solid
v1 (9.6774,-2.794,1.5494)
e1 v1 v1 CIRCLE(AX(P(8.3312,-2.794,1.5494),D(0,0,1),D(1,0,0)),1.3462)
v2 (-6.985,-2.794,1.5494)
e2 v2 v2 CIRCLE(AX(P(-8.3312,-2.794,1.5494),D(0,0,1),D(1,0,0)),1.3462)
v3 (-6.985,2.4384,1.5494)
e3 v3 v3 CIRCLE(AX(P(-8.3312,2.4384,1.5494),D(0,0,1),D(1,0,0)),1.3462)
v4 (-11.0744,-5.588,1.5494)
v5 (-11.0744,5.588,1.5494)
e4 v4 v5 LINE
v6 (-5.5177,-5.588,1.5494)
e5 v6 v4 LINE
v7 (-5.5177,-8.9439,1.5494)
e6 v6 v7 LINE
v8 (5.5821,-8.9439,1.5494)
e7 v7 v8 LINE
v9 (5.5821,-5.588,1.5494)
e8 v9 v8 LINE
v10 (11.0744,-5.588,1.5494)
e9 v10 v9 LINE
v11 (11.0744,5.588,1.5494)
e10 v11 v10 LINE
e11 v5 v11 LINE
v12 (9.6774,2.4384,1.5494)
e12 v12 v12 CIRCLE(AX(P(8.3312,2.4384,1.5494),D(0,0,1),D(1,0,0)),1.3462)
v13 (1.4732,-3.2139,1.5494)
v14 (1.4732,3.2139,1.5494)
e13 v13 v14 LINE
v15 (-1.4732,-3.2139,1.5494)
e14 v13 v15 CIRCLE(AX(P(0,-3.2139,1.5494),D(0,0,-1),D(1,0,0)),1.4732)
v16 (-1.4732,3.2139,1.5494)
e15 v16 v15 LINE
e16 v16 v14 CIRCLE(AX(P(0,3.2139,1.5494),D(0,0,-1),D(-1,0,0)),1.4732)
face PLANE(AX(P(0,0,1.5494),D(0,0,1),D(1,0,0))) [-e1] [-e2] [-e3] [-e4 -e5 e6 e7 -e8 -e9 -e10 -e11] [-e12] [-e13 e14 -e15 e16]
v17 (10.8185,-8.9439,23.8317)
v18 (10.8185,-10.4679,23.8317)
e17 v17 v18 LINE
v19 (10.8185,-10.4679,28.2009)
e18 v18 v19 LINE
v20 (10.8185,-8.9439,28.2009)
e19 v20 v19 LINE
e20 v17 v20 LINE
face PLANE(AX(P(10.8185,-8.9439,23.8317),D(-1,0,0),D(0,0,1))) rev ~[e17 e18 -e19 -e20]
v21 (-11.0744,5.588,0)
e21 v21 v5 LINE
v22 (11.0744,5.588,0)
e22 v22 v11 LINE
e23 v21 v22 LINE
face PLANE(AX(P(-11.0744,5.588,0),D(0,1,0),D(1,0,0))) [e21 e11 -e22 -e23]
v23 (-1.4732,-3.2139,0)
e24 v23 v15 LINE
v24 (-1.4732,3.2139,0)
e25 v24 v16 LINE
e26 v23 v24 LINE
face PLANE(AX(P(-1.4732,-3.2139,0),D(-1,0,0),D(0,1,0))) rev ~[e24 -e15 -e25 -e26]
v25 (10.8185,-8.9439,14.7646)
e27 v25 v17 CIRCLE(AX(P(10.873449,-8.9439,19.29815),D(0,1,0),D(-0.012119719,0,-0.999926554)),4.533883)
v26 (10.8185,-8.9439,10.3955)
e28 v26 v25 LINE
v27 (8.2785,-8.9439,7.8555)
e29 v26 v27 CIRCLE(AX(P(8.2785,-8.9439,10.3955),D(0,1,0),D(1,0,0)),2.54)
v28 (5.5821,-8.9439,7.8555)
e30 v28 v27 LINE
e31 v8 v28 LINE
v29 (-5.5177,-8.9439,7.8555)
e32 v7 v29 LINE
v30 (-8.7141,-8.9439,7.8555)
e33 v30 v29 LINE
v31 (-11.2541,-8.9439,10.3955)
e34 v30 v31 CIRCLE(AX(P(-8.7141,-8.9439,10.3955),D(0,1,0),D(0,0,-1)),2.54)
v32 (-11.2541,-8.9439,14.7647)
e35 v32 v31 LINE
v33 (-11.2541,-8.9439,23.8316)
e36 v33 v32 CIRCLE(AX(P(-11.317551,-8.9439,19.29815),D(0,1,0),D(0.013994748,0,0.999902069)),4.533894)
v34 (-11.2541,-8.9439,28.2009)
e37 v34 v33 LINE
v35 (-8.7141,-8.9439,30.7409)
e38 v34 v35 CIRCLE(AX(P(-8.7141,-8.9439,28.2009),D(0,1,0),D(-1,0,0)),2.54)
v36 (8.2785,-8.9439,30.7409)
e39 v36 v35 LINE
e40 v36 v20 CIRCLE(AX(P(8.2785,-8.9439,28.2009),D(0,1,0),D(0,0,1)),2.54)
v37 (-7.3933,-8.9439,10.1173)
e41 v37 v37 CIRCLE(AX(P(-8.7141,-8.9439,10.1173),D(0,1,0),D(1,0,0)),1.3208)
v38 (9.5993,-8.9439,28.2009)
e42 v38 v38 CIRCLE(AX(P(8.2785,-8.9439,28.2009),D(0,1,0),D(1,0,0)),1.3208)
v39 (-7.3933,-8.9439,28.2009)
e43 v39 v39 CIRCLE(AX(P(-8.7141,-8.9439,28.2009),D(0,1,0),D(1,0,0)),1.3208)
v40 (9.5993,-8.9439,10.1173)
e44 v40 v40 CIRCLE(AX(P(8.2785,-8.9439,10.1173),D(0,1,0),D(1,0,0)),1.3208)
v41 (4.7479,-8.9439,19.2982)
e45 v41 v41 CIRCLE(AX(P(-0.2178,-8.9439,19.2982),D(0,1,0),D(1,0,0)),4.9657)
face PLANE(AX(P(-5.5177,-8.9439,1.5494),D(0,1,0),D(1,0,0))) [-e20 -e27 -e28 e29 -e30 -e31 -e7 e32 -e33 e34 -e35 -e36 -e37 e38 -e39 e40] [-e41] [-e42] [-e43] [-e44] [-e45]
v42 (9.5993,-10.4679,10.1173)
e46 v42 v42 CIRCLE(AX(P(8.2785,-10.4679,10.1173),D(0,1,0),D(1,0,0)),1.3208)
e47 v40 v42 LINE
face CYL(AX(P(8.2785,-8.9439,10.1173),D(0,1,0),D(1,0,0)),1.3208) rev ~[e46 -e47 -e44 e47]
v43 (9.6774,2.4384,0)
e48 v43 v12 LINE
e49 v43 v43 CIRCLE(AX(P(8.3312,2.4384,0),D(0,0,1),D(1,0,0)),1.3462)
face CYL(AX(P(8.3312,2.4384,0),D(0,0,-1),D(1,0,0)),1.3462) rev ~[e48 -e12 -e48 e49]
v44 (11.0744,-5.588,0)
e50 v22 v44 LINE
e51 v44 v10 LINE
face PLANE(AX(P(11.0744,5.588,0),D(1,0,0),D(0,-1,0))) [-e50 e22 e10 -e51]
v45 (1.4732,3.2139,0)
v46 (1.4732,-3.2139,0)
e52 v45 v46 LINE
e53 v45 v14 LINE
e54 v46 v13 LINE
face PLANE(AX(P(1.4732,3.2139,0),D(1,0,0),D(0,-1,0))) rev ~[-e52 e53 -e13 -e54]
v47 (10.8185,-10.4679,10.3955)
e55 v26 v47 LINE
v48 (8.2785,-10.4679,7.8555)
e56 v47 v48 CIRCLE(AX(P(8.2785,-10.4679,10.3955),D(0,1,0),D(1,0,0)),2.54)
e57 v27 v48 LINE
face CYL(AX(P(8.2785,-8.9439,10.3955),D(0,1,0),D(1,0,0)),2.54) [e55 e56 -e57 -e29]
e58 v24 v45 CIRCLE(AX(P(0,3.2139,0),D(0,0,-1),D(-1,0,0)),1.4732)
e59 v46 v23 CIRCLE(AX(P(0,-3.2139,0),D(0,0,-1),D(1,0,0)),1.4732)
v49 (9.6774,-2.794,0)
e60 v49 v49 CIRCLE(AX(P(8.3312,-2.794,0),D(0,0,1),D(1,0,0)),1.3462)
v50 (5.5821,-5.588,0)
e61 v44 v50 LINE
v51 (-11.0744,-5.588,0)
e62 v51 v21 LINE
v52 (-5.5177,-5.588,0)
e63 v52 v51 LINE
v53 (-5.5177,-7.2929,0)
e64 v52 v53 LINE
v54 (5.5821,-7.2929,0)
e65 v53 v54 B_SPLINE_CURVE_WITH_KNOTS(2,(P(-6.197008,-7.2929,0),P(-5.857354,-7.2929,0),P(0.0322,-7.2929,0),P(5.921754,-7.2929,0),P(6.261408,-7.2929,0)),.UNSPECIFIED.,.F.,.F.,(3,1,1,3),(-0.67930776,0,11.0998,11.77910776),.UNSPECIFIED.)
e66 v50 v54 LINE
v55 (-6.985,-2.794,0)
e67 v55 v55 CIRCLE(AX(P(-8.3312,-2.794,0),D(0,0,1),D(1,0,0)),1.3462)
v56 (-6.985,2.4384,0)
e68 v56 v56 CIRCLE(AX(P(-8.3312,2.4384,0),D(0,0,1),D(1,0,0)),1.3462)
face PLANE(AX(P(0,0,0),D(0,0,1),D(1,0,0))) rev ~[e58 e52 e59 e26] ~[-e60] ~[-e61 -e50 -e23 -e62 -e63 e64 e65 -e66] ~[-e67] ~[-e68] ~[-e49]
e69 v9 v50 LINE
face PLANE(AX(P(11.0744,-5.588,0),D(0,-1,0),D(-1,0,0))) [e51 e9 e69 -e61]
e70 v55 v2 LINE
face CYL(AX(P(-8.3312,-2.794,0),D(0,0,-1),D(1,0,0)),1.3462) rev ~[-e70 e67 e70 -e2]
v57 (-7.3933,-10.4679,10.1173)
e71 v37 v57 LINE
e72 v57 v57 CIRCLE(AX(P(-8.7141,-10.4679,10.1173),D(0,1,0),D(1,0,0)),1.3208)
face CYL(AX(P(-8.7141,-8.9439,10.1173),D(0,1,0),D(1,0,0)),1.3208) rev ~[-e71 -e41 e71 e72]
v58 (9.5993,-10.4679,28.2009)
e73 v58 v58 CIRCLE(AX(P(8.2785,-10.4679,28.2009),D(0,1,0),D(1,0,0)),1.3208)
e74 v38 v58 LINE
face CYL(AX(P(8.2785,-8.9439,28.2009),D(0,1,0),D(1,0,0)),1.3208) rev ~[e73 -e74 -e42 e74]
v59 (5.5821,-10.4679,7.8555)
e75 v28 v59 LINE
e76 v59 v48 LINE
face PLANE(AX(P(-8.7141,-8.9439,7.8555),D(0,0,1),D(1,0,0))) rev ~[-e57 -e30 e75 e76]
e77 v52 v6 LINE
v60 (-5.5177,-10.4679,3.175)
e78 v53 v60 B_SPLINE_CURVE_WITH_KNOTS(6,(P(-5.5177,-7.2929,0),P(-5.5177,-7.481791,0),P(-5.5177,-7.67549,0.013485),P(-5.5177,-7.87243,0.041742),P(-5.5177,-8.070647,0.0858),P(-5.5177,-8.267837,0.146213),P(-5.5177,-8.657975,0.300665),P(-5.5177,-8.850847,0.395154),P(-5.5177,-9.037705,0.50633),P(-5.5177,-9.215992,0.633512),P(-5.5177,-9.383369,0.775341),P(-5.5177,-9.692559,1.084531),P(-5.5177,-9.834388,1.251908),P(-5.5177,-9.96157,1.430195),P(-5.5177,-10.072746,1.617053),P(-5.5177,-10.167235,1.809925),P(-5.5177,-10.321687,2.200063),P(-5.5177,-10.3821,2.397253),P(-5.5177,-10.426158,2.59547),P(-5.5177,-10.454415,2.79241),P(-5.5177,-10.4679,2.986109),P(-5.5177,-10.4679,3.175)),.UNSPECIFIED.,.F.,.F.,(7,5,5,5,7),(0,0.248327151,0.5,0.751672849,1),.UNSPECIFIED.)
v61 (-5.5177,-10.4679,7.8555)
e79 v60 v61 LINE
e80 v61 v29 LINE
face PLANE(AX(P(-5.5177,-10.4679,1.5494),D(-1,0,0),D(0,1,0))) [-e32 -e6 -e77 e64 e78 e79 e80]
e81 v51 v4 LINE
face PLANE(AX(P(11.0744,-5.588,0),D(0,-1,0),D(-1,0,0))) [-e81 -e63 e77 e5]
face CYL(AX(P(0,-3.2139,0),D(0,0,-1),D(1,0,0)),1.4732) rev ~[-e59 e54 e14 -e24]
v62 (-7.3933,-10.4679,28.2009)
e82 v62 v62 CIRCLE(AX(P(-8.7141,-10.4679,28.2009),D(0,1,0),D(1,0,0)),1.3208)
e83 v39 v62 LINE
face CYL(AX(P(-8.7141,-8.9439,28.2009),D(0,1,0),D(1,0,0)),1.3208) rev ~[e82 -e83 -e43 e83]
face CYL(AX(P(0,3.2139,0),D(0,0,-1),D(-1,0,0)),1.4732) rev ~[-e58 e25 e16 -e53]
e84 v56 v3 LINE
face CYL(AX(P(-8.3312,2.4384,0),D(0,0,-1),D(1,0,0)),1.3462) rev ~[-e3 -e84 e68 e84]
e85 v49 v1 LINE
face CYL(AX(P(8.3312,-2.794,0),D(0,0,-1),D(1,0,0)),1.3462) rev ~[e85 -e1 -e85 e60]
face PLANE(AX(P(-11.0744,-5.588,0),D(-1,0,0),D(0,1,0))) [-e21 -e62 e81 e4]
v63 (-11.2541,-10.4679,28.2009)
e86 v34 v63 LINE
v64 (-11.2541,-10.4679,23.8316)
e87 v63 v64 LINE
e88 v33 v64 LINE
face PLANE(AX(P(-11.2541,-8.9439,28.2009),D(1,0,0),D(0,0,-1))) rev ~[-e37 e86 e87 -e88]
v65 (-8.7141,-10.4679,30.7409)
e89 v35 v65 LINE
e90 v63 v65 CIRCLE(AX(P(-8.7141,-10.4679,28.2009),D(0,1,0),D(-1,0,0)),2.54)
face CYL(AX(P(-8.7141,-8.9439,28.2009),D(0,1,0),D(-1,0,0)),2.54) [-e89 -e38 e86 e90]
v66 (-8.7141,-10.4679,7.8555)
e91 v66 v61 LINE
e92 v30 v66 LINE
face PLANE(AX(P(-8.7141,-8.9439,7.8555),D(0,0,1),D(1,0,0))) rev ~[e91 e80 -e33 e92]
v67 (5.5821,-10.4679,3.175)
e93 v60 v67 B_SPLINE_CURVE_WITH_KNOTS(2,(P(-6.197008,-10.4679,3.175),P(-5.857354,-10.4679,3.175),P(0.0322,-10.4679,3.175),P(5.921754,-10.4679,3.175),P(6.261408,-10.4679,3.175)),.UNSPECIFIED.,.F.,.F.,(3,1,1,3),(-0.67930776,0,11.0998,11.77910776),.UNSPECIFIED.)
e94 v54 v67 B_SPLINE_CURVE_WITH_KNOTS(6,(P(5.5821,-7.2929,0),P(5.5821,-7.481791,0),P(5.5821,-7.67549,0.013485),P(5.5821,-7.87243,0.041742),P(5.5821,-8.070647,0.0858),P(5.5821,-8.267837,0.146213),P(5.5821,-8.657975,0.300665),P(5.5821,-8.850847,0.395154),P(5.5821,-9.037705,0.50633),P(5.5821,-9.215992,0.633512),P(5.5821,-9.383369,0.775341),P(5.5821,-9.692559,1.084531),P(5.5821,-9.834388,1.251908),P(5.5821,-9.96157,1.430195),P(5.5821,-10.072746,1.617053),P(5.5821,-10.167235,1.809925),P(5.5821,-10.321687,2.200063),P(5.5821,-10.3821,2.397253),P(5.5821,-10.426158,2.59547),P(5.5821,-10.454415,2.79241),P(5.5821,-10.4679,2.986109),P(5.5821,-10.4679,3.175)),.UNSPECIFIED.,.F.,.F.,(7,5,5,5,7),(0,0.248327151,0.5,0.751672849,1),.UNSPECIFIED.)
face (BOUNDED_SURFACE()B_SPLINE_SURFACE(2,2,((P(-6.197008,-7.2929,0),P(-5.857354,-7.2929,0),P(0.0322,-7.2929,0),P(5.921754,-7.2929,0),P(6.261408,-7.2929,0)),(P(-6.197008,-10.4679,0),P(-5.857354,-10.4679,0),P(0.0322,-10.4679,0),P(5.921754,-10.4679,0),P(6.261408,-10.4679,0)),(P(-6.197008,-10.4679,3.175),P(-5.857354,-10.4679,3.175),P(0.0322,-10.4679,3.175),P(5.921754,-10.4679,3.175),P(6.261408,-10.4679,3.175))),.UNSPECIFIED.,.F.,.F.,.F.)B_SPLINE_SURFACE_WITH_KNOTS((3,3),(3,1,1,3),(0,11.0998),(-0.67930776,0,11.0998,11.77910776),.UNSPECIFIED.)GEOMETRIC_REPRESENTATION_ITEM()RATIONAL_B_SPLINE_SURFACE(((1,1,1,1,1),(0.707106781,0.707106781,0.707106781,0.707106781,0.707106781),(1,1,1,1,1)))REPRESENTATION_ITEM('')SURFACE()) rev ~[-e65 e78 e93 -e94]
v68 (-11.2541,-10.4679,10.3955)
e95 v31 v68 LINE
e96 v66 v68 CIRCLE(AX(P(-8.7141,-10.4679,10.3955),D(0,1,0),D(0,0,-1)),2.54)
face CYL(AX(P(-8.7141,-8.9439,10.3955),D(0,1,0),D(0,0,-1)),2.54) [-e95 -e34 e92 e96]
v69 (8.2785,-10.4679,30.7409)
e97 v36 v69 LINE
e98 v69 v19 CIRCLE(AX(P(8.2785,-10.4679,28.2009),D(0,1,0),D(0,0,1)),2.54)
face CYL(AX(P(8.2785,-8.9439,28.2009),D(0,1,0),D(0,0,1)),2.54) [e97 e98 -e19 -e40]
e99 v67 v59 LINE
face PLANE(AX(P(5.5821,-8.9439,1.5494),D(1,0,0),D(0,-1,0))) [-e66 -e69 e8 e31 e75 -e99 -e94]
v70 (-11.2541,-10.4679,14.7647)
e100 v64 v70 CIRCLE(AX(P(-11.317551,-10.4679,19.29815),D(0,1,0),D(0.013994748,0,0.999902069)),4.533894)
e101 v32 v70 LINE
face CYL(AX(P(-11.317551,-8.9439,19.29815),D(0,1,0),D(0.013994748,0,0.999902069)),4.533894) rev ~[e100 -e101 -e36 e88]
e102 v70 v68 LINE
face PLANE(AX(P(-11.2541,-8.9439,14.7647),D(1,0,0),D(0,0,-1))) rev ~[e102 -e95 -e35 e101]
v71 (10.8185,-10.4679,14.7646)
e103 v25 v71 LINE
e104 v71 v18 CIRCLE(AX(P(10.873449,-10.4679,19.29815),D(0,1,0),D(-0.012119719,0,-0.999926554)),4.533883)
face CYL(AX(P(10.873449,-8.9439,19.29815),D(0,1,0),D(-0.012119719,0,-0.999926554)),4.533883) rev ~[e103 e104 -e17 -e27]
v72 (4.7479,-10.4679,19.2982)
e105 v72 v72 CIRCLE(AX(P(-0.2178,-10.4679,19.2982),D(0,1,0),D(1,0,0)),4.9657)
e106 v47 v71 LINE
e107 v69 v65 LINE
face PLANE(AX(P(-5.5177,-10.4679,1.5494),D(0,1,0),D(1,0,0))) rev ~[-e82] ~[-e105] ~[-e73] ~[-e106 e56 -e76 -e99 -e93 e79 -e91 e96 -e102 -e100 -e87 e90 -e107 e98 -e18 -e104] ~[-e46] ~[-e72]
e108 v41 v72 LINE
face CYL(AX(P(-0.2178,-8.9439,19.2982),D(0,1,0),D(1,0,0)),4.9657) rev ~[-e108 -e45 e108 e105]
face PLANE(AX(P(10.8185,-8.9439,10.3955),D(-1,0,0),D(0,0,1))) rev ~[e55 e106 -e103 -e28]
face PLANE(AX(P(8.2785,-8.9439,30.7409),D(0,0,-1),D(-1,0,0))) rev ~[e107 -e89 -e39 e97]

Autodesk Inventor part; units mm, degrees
ref_plane "YZ Plane" through (0, 0, 0) normal (1, 0, 0) x (0, 1, 0)
ref_plane "XZ Plane" through (0, 0, 0) normal (0, 1, 0) x (-1, 0, 0)
ref_plane "XY Plane" through (0, 0, 0) normal (0, 0, 1) x (1, 0, 0)
sketch "Sketch1" plane through (0, 0, 0) normal (0, 0, 1) x (1, 0, 0)
  line L0 (-11.0744, 5.588) -> (11.0744, 5.588)
  line L1 (11.0744, 5.588) -> (11.0744, -5.588)
  line L2 (11.0744, -5.588) -> (-11.0744, -5.588)
  line L3 (-11.0744, -5.588) -> (-11.0744, 5.588)
  circle A0 centre (-8.3312, 2.4384) radius 1.3462
  circle A1 centre (8.3312, 2.4384) radius 1.3462
  circle A2 centre (8.3312, -2.794) radius 1.3462
  circle A3 centre (-8.3312, -2.794) radius 1.3462
  line L4 (0, -3.2143) -> (0, 3.2143) construction
  line L5 (1.4766, -3.2143) -> (1.4766, 3.2143)
  line L6 (-1.4766, 3.2143) -> (-1.4766, -3.2143)
  arc A4 (-1.4766, -3.2143) -> (1.4766, -3.2143) centre (0, -3.2143) ccw
  arc A5 (1.4766, 3.2143) -> (-1.4766, 3.2143) centre (0, 3.2143) ccw
  point P0 (0, 0)
  dimension "d0" = 22.1488
  dimension "d1" = 11.176
  dimension "d2" = 2.6924
  dimension "d3" = 2.6924
  dimension "d4" = 2.6924
  dimension "d5" = 2.6924
  dimension "d6" = 3.1496
  dimension "d7" = 2.794
  dimension "d8" = 5.2324
  dimension "d9" = 2.7432
  dimension "d10" = 2.7432
  dimension "d11" = 3.1496
  dimension "d12" = 2.794
extrude "Extrusion1" add sketch "Sketch1" along normal blind 1.5494 contours L0 L1 L2 L3 | A4 L6 A5 L5
sketch "Sketch2" plane through (-11.0744, -5.588, 0) normal (0, -1, 0) x (1, 0, 0)
  line L0 (5.5567, 1.5494) -> (16.6565, 1.5494)
  line L1 (16.6565, 1.5494) -> (16.6565, 0)
  line L2 (16.6565, 0) -> (5.5567, 0)
  line L3 (5.5567, 0) -> (5.5567, 1.5494)
  line L4 (22.1488, 0) -> (22.1488, 1.5494) projected
  line L5 (0, 0) -> (0, 1.5494) projected
  line L6 (22.1488, 1.5494) -> (0, 1.5494) projected
  line L7 (0, 0) -> (22.1488, 0) projected
  point P0 (11.0744, 0)
  dimension "d15" = 11.0998
  dimension "d16" = 1.5494
extrude "Extrusion2" add sketch "Sketch2" along normal blind 3.3782 contours L0 L1 L2 L3
sketch "Sketch3" plane through (-5.5177, -5.588, 1.5494) normal (0, 0, 1) x (1, 0, 0)
  line L0 (0, -3.3559) -> (11.0998, -3.3559)
  line L1 (11.0998, -3.3559) -> (11.0998, -4.8799)
  line L2 (11.0998, -4.8799) -> (0, -4.8799)
  line L3 (0, -4.8799) -> (0, -3.3559)
  point P0 (5.5177, 5.588)
  dimension "d19" = 11.0998
  dimension "d20" = 1.524
extrude "Extrusion3" add sketch "Sketch3" along normal blind 6.4008
sketch "Sketch4" plane through (-5.5177, -8.9439, 1.5494) normal (0, 1, 0) x (1, 0, 0)
  line L0 (13.7962, -29.1915) -> (-3.1964, -29.1915)
  line L1 (-3.1964, -6.3061) -> (13.7962, -6.3061)
  line L2 (-5.5567, 1.5494) -> (16.5921, 1.5494) projected
  arc A0 (-5.7364, -22.2822) -> (-5.7364, -13.2153) centre (-5.7998, -17.7488) ccw
  arc A1 (16.3362, -13.2152) -> (16.3362, -22.2823) centre (16.3912, -17.7488) ccw
  line L3 (16.3362, -8.8461) -> (16.3362, -13.2152)
  line L4 (16.3362, -22.2823) -> (16.3362, -26.6515)
  line L5 (-5.7364, -26.6515) -> (-5.7364, -22.2822)
  line L6 (-5.7364, -13.2153) -> (-5.7364, -8.8461)
  circle A2 centre (5.2999, -17.7488) radius 4.9657
  arc A3 (13.7962, -29.1915) -> (16.3362, -26.6515) centre (13.7962, -26.6515) ccw
  arc A4 (-5.7364, -26.6515) -> (-3.1964, -29.1915) centre (-3.1964, -26.6515) ccw
  arc A5 (16.3362, -8.8461) -> (13.7962, -6.3061) centre (13.7962, -8.8461) ccw
  arc A6 (-3.1964, -6.3061) -> (-5.7364, -8.8461) centre (-3.1964, -8.8461) ccw
  circle A7 centre (13.7962, -26.6515) radius 1.3208
  circle A8 centre (13.7962, -8.5679) radius 1.3208
  circle A9 centre (-3.1964, -8.5679) radius 1.3208
  circle A10 centre (-3.1964, -26.6515) radius 1.3208
  point P0 (5.5177, 1.5494)
  point P1 (-5.7364, -6.3061)
  point P2 (-5.7364, -29.1915)
  point P3 (16.3362, -6.3061)
  point P4 (5.5177, 1.5494)
  point P5 (16.3362, -17.7488)
  point P6 (5.5177, 1.5494)
  dimension "d25" = 9.0678
  dimension "d26" = 9.0678
  dimension "d27" = 9.9314
  dimension "d28" = 2.54
  dimension "d29" = 2.6416
  dimension "d30" = 2.6416
  dimension "d31" = 2.6416
  dimension "d32" = 2.6416
  dimension "d33" = 2.54
extrude "Extrusion4" add sketch "Sketch4" against normal blind 1.524
sketch "Sketch5" plane through (-11.0744, -8.9662, 0) normal (0, -1, 0) x (1, 0, 0)
  line L0 (16.6565, 1.5494) -> (5.5567, 1.5494) projected
  line L1 (5.5567, 1.5494) -> (5.5567, 0) projected
  line L2 (5.5567, 0) -> (16.6565, 0) projected
  line L3 (16.6565, 0) -> (16.6565, 1.5494) projected
  point P0 (11.0744, 0)
extrude "Extrusion5" add sketch "Sketch5" along normal blind 1.5016
fillet "Fillet1" radius 3.175 1 edges at (0.0322, -10.4678, 0)
sketch "Sketch6" plane through (0, 0, 0) normal (0, 0, -1) x (-1, 0, 0)
  line L0 (0, -3.2139) -> (0, 3.2139) construction
  line L1 (1.4732, -3.2139) -> (1.4732, 3.2139)
  line L2 (-1.4732, 3.2139) -> (-1.4732, -3.2139)
  arc A0 (-1.4732, -3.2139) -> (1.4732, -3.2139) centre (0, -3.2139) ccw
  arc A1 (1.4732, 3.2139) -> (-1.4732, 3.2139) centre (0, 3.2139) ccw
  point P0 (0, 0)
  dimension "d41" = 2.9464
extrude "Extrusion6" cut sketch "Sketch6" against normal blind 9.4615
equation "\"BendRadius\" = Thickness"
equation "\"BendReliefWidth\" = Thickness"
equation "\"BendReliefDepth\" = 0.5 * Thickness"
equation "\"CornerReliefSize\" = 4 * Thickness"
equation "\"MinimumRemnant\" = 2 * Thickness"
equation "\"TransitionRadius\" = BendRadius"
equation "\"JacobiRadiusSize\" = Thickness"
equation "\"GapSize\" = Thickness"
equation "\"Thickness\" = 3.048"
properties part number "motor mount complete"
